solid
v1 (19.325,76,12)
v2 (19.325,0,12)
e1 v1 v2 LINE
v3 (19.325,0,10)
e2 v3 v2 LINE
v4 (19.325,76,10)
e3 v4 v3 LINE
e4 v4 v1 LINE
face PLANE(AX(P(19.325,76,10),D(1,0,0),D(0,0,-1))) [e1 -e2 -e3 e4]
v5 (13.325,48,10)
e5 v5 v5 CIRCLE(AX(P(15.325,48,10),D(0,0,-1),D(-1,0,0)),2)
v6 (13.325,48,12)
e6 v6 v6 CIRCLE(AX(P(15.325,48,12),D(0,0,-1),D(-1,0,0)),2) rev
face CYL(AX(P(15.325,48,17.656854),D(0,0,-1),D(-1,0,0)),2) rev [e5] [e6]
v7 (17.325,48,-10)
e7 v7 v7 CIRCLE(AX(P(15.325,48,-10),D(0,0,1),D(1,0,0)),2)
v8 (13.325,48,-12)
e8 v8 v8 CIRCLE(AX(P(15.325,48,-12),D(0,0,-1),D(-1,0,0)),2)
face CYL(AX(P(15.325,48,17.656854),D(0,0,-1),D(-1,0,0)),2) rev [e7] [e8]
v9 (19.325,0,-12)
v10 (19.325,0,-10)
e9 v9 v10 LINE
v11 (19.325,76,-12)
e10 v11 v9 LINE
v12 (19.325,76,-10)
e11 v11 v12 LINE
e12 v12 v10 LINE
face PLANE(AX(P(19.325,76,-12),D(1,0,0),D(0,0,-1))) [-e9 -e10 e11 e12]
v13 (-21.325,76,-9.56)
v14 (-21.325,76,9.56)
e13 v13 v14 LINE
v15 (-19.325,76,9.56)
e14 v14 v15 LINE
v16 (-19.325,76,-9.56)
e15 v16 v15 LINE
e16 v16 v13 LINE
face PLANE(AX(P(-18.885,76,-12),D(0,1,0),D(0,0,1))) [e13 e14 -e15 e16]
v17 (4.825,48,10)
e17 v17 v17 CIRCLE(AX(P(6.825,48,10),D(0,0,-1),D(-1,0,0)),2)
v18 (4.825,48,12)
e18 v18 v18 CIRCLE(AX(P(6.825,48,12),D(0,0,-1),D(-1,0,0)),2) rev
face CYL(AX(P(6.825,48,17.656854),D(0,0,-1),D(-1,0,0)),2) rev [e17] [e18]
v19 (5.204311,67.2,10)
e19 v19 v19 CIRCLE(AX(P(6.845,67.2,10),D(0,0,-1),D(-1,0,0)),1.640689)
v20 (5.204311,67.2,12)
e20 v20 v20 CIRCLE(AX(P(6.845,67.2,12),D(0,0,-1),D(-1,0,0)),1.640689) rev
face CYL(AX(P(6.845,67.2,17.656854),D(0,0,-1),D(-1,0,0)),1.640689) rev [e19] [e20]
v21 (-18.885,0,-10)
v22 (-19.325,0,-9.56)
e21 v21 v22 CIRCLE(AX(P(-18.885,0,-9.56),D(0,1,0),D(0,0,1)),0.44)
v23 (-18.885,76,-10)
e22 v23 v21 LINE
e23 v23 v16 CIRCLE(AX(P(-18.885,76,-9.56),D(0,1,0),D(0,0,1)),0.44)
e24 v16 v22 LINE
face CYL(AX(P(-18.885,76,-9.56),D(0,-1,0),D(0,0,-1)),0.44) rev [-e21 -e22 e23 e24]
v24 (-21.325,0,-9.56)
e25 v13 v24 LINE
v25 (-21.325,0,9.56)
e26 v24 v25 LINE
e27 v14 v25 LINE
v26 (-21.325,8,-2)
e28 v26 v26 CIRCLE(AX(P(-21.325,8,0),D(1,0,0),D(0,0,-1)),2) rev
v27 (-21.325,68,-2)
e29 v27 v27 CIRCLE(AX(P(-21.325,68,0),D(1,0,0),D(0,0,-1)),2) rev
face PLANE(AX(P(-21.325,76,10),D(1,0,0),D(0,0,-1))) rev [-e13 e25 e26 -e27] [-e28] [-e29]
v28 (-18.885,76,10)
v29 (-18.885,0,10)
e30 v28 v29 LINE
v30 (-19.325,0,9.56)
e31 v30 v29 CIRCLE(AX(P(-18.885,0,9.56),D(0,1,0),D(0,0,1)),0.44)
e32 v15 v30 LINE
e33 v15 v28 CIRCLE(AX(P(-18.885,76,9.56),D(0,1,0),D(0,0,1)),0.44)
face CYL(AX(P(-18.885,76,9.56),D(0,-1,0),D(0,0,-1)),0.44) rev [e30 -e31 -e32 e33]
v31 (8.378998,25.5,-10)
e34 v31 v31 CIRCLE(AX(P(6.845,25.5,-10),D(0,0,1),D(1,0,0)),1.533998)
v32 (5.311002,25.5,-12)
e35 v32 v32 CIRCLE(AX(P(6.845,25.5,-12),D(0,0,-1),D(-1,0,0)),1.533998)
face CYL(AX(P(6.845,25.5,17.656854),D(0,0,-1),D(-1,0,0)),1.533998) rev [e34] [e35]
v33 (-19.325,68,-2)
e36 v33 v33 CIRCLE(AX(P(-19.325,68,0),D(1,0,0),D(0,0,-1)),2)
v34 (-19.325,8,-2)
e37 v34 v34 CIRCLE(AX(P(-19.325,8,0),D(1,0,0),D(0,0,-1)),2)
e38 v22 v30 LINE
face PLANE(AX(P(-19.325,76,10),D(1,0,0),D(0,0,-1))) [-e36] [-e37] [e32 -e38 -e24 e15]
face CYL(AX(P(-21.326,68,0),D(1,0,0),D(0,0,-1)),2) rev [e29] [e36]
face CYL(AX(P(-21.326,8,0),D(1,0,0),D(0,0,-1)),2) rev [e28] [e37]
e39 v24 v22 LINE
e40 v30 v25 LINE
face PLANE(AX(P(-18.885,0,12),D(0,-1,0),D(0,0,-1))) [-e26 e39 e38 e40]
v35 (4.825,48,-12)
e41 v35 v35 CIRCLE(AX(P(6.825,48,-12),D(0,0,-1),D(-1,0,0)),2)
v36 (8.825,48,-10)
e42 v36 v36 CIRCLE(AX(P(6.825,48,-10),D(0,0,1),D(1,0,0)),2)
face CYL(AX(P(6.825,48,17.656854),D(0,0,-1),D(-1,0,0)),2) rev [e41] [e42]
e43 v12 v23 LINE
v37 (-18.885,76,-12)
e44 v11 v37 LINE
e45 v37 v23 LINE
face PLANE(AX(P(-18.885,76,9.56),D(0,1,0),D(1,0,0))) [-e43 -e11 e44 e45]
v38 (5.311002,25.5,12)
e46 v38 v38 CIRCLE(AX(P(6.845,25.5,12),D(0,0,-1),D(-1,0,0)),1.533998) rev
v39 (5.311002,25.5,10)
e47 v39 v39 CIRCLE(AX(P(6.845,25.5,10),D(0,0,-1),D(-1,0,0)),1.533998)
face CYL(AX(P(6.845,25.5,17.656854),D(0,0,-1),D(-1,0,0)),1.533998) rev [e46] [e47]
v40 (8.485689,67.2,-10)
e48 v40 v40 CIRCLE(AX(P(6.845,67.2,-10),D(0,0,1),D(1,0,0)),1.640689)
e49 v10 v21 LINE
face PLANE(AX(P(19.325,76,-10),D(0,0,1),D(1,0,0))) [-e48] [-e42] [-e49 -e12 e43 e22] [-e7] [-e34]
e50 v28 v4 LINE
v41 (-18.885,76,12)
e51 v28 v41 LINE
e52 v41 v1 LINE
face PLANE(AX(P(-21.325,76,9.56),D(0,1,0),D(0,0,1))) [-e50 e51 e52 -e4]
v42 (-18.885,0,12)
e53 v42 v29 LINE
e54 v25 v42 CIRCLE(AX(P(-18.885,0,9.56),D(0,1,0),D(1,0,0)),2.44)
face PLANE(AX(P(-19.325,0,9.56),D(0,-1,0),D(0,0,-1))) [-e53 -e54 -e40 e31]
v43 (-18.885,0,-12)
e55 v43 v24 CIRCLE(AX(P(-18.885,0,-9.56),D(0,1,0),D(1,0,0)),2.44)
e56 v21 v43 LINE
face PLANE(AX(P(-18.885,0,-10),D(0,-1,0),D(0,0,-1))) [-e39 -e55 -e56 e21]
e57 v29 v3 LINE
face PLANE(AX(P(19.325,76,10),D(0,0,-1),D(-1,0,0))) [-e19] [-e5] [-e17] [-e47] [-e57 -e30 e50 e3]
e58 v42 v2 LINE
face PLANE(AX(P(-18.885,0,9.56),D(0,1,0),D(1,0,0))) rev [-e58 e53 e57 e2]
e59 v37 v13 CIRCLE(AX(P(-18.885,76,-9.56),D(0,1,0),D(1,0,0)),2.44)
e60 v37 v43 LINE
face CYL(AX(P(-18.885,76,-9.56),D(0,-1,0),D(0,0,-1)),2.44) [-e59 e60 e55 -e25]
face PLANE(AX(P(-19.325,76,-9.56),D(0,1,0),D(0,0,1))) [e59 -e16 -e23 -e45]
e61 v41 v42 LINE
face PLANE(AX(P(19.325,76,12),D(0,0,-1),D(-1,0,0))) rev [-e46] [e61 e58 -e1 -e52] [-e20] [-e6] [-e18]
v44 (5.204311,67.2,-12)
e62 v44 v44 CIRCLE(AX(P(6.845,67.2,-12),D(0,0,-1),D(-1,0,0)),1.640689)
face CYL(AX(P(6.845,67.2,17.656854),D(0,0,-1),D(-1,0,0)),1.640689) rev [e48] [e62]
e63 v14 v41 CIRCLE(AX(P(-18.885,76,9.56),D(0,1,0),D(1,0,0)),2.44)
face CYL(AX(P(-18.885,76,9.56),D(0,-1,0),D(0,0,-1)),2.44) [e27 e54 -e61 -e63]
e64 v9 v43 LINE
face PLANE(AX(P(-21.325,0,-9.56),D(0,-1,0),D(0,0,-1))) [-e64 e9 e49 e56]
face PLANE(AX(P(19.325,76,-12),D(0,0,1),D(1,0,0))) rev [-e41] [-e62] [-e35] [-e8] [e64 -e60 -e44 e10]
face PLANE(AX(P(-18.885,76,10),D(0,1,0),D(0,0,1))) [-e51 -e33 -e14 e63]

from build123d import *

# Parameters (mm, degrees)
BASE_FLANGE1_DEPTH = 76
CUT_EXTRUDE1_REACH = 84.503
SKETCH2_R          = 1.640689261
SKETCH2_R_2        = 1.533997934
SKETCH2_R_3        = 2
CUT_EXTRUDE2_REACH = 88.104
SKETCH3_R          = 2


# Sheet-metal steps are written as plain solids
with BuildPart() as part:
    # Sketch1 → Base-Flange1 (new body)
    with BuildSketch(Plane(origin=(0, 0, 0), x_dir=(1, 0, 0), z_dir=(0, 1, 0))):
        with BuildLine():
            Line((19.325, -10), (-18.885, -10))
            ThreePointArc((-18.885, -10), (-19.196126984, -9.871126984), (-19.325, -9.56))
            Line((-19.325, -9.56), (-19.325, 9.56))
            ThreePointArc((-19.325, 9.56), (-19.196126984, 9.871126984), (-18.885, 10))
            Line((-18.885, 10), (19.325, 10))
            Line((19.325, 10), (19.325, 12))
            Line((19.325, 12), (-18.885, 12))
            ThreePointArc((-18.885, 12), (-20.610340546, 11.285340546), (-21.325, 9.56))
            Line((-21.325, 9.56), (-21.325, -9.56))
            ThreePointArc((-21.325, -9.56), (-20.610340546, -11.285340546), (-18.885, -12))
            Line((-18.885, -12), (19.325, -12))
            Line((19.325, -12), (19.325, -10))
        make_face()
    extrude(amount=BASE_FLANGE1_DEPTH)

    # Cut-Extrude1: up to this face of the body (flat: up to its plane)
    cut_extrude1_end = Plane(part.part.faces().sort_by_distance((0.22, 38, 12))[0])
    # Sketch2 → Cut-Extrude1 (cut, up to the picked face)
    with BuildSketch(Plane(origin=(0, 0, -12), x_dir=(-1, 0, 0), z_dir=(0, 0, -1)), mode=Mode.PRIVATE) as cut_extrude1_sk1:
        with Locations((-6.845, 67.2)):
            Circle(SKETCH2_R)
    cut_extrude1_tool1 = split(extrude(cut_extrude1_sk1.sketch, amount=-CUT_EXTRUDE1_REACH, mode=Mode.PRIVATE), bisect_by=cut_extrude1_end, keep=Keep.BOTH, mode=Mode.PRIVATE)
    # Sketch2 → Cut-Extrude1 (cut, up to the picked face)
    with BuildSketch(Plane(origin=(0, 0, -12), x_dir=(-1, 0, 0), z_dir=(0, 0, -1)), mode=Mode.PRIVATE) as cut_extrude1_sk2:
        with Locations((-6.845, 25.5)):
            Circle(SKETCH2_R_2)
    cut_extrude1_tool2 = split(extrude(cut_extrude1_sk2.sketch, amount=-CUT_EXTRUDE1_REACH, mode=Mode.PRIVATE), bisect_by=cut_extrude1_end, keep=Keep.BOTH, mode=Mode.PRIVATE)
    # Sketch2 → Cut-Extrude1 (cut, up to the picked face)
    with BuildSketch(Plane(origin=(0, 0, -12), x_dir=(-1, 0, 0), z_dir=(0, 0, -1)), mode=Mode.PRIVATE) as cut_extrude1_sk3:
        with Locations((-6.825, 48)):
            Circle(SKETCH2_R_3)
    cut_extrude1_tool3 = split(extrude(cut_extrude1_sk3.sketch, amount=-CUT_EXTRUDE1_REACH, mode=Mode.PRIVATE), bisect_by=cut_extrude1_end, keep=Keep.BOTH, mode=Mode.PRIVATE)
    # Sketch2 → Cut-Extrude1 (cut, up to the picked face)
    with BuildSketch(Plane(origin=(0, 0, -12), x_dir=(-1, 0, 0), z_dir=(0, 0, -1)), mode=Mode.PRIVATE) as cut_extrude1_sk4:
        with Locations((-15.325, 48)):
            Circle(SKETCH2_R_3)
    cut_extrude1_tool4 = split(extrude(cut_extrude1_sk4.sketch, amount=-CUT_EXTRUDE1_REACH, mode=Mode.PRIVATE), bisect_by=cut_extrude1_end, keep=Keep.BOTH, mode=Mode.PRIVATE)
    add(cut_extrude1_tool1.solids().sort_by(Axis((6.845, 67.2, -12), (0, 0, 1)))[0], mode=Mode.SUBTRACT)
    add(cut_extrude1_tool2.solids().sort_by(Axis((6.845, 25.5, -12), (0, 0, 1)))[0], mode=Mode.SUBTRACT)
    add(cut_extrude1_tool3.solids().sort_by(Axis((6.825, 48, -12), (0, 0, 1)))[0], mode=Mode.SUBTRACT)
    add(cut_extrude1_tool4.solids().sort_by(Axis((15.325, 48, -12), (0, 0, 1)))[0], mode=Mode.SUBTRACT)

    # Sketch3 → Cut-Extrude2 (cut, up to next)
    with BuildSketch(Plane(origin=(-19.325, 0, 0), x_dir=(0, 0, -1), z_dir=(1, 0, 0)), mode=Mode.PRIVATE) as cut_extrude2_sk1:
        with Locations((0, 68)):
            Circle(SKETCH3_R)
    cut_extrude2_tool1 = extrude(cut_extrude2_sk1.sketch, amount=-CUT_EXTRUDE2_REACH, mode=Mode.PRIVATE) & part.part
    # Sketch3 → Cut-Extrude2 (cut, up to next)
    with BuildSketch(Plane(origin=(-19.325, 0, 0), x_dir=(0, 0, -1), z_dir=(1, 0, 0)), mode=Mode.PRIVATE) as cut_extrude2_sk2:
        with Locations((0, 8)):
            Circle(SKETCH3_R)
    cut_extrude2_tool2 = extrude(cut_extrude2_sk2.sketch, amount=-CUT_EXTRUDE2_REACH, mode=Mode.PRIVATE) & part.part
    add(cut_extrude2_tool1.solids().sort_by_distance((-19.325, 68, 0))[0], mode=Mode.SUBTRACT)
    add(cut_extrude2_tool2.solids().sort_by_distance((-19.325, 8, 0))[0], mode=Mode.SUBTRACT)


solid = part.part
